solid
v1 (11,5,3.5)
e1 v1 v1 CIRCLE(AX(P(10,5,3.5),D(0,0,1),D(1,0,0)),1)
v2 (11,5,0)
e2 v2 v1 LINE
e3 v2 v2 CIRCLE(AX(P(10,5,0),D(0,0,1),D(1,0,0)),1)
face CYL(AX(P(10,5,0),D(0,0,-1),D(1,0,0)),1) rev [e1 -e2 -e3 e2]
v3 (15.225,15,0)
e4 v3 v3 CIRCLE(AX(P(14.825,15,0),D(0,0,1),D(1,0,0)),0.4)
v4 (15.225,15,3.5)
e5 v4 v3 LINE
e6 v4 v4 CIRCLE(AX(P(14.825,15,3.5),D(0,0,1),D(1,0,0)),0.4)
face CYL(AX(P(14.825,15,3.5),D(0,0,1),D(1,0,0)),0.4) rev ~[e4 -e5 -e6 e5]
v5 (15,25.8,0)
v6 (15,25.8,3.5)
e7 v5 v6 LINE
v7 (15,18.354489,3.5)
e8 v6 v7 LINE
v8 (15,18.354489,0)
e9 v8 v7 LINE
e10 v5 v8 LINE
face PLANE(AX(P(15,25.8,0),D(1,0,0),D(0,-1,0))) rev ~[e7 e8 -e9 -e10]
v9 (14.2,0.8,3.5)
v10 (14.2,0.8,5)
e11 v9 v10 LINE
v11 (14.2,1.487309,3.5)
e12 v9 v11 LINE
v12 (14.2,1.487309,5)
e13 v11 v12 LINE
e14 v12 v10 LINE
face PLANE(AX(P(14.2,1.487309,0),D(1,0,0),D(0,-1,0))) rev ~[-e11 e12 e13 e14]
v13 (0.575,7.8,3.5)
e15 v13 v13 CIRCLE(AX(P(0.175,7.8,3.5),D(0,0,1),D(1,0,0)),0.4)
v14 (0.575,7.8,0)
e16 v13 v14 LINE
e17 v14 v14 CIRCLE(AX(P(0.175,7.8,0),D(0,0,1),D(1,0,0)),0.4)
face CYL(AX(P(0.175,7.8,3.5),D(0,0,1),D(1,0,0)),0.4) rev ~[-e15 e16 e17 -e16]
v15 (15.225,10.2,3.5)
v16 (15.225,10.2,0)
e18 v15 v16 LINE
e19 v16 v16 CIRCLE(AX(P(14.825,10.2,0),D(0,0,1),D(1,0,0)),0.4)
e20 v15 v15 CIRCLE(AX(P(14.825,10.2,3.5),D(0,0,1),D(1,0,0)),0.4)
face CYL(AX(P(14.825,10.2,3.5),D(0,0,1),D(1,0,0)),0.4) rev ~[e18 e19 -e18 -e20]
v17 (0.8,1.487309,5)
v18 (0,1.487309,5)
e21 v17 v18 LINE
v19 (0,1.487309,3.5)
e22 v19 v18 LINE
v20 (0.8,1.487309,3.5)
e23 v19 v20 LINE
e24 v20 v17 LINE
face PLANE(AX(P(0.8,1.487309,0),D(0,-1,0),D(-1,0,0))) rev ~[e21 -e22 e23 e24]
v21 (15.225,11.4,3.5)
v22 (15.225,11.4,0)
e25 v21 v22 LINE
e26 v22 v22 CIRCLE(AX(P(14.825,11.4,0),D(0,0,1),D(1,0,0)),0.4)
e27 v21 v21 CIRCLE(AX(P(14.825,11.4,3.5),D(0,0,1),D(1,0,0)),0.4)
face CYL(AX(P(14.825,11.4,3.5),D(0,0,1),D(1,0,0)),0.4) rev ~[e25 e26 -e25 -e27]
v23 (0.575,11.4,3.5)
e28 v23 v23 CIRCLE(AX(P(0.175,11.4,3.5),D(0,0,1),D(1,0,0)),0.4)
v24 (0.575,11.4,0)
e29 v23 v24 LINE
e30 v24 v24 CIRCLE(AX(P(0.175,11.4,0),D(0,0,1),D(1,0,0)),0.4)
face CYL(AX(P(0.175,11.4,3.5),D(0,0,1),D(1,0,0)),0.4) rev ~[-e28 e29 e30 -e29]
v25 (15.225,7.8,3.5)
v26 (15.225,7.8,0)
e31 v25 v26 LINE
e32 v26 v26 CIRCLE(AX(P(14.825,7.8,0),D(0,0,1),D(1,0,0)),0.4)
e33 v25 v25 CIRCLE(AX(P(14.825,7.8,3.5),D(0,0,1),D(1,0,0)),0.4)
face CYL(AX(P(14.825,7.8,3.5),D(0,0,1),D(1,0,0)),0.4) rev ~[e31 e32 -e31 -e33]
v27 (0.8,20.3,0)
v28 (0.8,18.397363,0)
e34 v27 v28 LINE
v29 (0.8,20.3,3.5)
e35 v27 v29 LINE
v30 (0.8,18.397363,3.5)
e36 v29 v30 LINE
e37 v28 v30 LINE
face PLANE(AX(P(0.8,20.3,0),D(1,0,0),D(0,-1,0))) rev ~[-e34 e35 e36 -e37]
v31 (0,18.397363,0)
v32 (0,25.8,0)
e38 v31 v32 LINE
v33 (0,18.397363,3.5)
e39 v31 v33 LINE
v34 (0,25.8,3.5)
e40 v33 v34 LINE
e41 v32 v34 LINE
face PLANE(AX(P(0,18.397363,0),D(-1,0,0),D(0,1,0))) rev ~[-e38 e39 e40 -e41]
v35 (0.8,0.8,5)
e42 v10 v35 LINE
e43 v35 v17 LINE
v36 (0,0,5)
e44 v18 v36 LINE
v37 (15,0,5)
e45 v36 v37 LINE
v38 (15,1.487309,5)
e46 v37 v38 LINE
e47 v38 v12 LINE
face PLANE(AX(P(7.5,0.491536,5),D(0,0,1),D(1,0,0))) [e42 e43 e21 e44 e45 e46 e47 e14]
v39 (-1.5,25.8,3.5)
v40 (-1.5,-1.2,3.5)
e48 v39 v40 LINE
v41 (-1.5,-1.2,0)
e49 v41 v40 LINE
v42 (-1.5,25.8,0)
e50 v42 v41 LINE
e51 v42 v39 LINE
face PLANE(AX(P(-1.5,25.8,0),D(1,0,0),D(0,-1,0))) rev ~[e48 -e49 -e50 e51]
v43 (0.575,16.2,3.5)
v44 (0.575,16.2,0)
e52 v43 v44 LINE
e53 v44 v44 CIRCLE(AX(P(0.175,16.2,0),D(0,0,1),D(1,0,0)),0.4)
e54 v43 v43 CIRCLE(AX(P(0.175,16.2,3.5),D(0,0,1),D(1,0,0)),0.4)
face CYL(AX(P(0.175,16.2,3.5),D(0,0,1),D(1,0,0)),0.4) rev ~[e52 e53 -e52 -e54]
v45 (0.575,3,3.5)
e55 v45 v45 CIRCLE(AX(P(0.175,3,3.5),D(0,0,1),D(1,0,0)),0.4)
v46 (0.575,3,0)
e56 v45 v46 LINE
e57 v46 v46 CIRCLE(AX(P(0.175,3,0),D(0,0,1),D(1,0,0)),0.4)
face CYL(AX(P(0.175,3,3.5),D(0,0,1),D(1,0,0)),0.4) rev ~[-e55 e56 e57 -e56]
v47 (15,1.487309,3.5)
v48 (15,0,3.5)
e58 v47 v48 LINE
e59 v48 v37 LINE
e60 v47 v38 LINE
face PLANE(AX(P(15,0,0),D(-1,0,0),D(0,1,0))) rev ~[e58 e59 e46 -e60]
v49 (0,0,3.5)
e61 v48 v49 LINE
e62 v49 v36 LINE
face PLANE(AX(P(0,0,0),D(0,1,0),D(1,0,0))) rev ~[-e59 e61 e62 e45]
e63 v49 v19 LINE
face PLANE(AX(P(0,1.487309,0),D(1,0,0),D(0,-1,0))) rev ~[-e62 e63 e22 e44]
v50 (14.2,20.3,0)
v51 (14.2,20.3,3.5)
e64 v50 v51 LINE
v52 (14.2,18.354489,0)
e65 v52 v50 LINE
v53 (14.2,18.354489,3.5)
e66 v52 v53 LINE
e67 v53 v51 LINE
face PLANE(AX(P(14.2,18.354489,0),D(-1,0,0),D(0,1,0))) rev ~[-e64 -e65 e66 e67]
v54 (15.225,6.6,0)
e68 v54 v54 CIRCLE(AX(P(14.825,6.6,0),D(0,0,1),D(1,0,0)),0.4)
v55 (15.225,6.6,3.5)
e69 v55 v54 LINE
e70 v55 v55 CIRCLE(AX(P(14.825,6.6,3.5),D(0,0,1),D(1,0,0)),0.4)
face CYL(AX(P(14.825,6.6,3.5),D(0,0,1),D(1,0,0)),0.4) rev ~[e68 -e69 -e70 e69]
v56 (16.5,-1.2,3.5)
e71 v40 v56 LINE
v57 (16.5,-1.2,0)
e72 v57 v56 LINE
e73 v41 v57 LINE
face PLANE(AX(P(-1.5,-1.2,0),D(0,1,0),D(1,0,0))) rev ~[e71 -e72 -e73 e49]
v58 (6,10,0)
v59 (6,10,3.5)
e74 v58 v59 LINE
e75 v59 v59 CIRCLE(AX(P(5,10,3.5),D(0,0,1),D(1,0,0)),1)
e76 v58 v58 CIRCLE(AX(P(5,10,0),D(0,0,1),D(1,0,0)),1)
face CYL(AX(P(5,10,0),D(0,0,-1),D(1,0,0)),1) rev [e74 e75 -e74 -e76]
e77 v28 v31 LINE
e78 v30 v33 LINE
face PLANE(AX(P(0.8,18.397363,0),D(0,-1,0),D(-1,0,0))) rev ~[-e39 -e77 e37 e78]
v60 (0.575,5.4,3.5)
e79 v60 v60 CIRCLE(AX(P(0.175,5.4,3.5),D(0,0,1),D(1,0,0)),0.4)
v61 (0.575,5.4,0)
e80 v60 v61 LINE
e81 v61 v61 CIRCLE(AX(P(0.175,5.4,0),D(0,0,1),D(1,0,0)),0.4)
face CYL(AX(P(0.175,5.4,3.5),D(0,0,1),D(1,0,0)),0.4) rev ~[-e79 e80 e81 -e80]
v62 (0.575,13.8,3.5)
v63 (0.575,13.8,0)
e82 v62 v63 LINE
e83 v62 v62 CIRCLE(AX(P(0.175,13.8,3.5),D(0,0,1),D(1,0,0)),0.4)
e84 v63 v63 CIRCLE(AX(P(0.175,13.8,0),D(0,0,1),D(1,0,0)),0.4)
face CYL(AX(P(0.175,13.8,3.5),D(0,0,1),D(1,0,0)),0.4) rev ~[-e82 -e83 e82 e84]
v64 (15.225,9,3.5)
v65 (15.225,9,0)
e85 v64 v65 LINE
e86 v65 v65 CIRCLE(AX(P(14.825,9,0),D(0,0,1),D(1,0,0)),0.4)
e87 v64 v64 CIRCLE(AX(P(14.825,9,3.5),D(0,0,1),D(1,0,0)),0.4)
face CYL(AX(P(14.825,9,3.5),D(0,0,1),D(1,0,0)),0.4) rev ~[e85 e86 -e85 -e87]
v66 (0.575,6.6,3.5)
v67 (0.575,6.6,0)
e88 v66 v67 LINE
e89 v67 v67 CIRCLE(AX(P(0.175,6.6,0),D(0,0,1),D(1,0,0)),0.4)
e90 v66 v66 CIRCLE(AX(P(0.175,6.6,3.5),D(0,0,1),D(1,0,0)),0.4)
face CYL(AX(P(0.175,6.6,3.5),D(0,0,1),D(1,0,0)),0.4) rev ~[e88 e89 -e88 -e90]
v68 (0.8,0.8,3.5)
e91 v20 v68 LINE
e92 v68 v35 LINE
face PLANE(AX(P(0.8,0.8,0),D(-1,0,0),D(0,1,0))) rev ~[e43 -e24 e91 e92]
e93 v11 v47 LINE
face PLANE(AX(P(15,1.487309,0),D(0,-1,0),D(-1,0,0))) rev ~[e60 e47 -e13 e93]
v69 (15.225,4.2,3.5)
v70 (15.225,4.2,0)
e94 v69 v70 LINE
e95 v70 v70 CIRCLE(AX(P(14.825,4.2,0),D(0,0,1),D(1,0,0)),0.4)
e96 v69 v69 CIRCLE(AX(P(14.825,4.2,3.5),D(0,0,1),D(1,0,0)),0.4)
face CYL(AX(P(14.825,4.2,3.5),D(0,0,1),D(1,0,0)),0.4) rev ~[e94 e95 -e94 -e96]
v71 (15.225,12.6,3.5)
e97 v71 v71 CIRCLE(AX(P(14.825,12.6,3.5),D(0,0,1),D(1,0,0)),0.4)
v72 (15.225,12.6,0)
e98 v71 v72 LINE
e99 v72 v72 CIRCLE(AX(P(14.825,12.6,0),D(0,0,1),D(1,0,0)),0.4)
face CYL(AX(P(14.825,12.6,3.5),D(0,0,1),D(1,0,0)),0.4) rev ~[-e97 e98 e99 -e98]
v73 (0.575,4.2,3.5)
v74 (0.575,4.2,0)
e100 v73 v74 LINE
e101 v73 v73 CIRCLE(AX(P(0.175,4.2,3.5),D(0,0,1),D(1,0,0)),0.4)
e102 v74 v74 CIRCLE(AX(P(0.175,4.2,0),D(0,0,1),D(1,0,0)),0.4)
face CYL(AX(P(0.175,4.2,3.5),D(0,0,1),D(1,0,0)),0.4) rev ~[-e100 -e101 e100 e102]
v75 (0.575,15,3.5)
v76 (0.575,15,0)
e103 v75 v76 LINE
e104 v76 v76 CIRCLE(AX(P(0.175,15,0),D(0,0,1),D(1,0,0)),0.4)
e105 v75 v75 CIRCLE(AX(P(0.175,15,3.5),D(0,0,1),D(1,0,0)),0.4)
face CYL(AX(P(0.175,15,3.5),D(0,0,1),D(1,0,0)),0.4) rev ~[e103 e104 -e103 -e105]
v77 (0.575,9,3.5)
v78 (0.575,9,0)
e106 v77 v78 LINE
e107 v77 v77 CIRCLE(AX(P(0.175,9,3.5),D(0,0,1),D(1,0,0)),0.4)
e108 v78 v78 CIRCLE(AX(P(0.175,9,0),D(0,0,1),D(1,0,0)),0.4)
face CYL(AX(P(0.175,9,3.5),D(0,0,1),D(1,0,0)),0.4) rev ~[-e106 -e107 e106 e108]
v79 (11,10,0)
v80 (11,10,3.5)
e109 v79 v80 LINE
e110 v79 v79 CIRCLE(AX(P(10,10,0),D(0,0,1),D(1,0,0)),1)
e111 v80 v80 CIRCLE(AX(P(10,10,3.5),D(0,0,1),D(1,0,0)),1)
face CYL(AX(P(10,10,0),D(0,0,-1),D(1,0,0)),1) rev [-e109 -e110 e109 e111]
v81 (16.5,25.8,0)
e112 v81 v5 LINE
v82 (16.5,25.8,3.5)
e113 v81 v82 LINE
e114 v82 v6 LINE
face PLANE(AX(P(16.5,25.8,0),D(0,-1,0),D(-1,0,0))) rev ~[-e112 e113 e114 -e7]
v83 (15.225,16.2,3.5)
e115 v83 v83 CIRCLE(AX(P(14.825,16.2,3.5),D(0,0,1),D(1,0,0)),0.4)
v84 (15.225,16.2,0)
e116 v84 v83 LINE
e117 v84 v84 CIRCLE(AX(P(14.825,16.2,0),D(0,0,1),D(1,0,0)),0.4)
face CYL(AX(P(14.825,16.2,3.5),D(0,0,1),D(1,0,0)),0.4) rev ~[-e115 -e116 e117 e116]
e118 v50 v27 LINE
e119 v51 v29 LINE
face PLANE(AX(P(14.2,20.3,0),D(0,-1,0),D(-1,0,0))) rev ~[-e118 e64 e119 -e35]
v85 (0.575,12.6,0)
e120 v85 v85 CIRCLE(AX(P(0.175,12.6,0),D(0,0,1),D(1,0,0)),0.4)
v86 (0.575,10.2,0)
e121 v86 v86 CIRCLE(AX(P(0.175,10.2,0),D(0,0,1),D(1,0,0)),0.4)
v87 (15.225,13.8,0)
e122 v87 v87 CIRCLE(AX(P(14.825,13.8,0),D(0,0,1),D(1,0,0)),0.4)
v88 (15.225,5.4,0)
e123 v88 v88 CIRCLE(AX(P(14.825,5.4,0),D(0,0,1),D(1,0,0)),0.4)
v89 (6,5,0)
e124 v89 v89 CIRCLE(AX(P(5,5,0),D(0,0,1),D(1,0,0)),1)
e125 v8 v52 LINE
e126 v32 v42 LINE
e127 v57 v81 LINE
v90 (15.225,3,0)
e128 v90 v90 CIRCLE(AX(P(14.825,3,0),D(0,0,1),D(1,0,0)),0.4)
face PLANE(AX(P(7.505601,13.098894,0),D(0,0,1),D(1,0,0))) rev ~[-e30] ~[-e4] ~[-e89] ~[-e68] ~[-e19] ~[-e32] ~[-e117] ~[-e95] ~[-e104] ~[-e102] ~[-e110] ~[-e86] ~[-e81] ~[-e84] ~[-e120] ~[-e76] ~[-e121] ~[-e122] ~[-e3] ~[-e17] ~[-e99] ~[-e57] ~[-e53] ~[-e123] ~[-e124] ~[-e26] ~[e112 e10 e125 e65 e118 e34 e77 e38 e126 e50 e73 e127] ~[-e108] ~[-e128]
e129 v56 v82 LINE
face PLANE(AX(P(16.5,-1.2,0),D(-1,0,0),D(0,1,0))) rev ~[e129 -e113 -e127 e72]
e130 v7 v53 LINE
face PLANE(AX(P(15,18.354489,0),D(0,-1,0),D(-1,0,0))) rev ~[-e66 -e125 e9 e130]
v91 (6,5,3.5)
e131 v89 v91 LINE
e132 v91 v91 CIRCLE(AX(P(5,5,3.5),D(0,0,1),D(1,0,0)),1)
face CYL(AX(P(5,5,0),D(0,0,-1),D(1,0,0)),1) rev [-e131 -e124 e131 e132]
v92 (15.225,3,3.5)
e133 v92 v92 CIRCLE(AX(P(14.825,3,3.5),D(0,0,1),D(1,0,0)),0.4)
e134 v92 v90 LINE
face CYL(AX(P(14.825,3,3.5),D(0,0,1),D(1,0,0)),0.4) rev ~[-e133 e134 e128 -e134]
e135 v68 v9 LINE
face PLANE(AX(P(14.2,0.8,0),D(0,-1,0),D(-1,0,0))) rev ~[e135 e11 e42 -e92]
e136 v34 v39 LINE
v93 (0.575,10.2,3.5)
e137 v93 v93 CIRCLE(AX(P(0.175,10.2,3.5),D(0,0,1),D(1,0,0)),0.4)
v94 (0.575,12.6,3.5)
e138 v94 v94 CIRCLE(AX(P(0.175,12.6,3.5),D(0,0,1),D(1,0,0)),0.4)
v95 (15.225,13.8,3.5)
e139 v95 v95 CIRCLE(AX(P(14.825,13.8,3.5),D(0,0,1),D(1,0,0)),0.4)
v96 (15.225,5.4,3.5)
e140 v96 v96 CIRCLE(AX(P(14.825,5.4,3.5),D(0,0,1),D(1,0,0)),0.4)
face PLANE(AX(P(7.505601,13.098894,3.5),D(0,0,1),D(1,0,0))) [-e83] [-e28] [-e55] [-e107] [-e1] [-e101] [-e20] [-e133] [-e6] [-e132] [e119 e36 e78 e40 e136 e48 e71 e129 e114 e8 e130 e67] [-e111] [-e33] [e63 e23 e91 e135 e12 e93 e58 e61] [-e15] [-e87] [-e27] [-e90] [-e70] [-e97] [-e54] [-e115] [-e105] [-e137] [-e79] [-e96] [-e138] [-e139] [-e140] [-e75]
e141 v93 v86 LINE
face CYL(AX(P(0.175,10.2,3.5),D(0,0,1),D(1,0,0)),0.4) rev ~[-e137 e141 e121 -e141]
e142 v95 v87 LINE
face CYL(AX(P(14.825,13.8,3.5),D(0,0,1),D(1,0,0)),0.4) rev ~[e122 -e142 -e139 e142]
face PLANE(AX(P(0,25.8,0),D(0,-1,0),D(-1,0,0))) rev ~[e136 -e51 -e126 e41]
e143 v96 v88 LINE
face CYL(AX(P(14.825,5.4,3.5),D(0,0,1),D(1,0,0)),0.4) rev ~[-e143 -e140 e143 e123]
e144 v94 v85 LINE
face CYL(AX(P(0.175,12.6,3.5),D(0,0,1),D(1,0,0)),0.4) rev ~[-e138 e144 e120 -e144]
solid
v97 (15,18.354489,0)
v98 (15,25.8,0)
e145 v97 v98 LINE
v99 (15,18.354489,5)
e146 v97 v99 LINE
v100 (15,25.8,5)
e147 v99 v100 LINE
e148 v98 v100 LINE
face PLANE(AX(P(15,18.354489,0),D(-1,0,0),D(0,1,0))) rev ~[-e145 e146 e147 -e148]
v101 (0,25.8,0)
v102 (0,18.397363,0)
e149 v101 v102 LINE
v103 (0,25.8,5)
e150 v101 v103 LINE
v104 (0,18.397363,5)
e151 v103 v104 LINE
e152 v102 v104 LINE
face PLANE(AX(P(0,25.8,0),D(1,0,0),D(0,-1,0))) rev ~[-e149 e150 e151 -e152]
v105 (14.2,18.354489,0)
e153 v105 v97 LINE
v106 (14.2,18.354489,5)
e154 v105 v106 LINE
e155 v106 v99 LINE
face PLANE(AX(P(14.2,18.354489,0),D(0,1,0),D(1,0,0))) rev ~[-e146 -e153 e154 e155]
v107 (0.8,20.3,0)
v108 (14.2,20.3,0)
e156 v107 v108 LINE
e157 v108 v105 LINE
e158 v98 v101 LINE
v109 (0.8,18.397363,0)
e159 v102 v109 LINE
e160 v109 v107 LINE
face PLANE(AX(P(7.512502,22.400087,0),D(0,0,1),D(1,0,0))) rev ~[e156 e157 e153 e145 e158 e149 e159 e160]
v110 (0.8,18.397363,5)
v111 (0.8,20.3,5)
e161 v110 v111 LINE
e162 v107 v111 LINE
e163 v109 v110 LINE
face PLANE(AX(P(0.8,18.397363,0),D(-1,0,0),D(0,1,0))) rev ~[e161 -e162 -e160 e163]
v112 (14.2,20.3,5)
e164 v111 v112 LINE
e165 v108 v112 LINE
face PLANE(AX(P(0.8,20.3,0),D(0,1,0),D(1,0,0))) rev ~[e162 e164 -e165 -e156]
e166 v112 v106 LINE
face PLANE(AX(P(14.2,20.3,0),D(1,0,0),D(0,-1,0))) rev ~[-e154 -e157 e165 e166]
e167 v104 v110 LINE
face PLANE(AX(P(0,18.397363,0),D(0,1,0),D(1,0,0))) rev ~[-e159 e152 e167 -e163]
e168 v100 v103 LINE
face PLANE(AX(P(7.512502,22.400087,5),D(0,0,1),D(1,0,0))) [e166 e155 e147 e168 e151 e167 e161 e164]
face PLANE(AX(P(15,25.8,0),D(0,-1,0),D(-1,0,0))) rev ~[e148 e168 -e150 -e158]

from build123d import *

# Parameters (mm, degrees)
F1_DEPTH = 5
F0_R     = 1
F2_DEPTH = 3.5
F3_R     = 0.4
F4_DEPTH = 12.5


with BuildPart() as f1:
    # F0 (on Top) → F1 (new body)
    with BuildSketch(Plane.XY):
        Polygon((0, 1.4873089967), (0, 0), (15, 0), (15, 1.4873089967), (14.2, 1.4873089967), (14.2, 0.8), (0.8, 0.8), (0.8, 1.4873089967), align=None)
    extrude(amount=F1_DEPTH)

    # F0 (on Top) → F2 (join)
    with BuildSketch(Plane.XY):
        Polygon((0, 18.3973629028), (0, 25.8), (-1.5, 25.8), (-1.5, -1.2), (16.5, -1.2), (16.5, 25.8), (15, 25.8), (15, 18.3544885367), (14.2, 18.3544885367), (14.2, 20.3), (0.8, 20.3), (0.8, 18.3973629028), align=None)
        with Locations((5, 5)):
            Circle(F0_R, mode=Mode.SUBTRACT)
        with Locations((5, 10)):
            Circle(F0_R, mode=Mode.SUBTRACT)
        Polygon((15, 0), (0, 0), (0, 1.4873089967), (0.8, 1.4873089967), (0.8, 0.8), (14.2, 0.8), (14.2, 1.4873089967), (15, 1.4873089967), align=None, mode=Mode.SUBTRACT)
        with Locations((10, 5)):
            Circle(F0_R, mode=Mode.SUBTRACT)
        with Locations((10, 10)):
            Circle(F0_R, mode=Mode.SUBTRACT)
    extrude(amount=F2_DEPTH)

    # F3 (on face) → F4 (cut, symmetric)
    with BuildSketch(Plane.XY.offset(3.5)):
        with Locations((0.175, 3)):
            Circle(F3_R)
        with Locations((0.175, 4.2)):
            Circle(F3_R)
        with Locations((0.175, 5.4)):
            Circle(F3_R)
        with Locations((0.175, 6.6)):
            Circle(F3_R)
        with Locations((0.175, 7.8)):
            Circle(F3_R)
        with Locations((0.175, 9)):
            Circle(F3_R)
        with Locations((0.175, 10.2)):
            Circle(F3_R)
        with Locations((0.175, 11.4)):
            Circle(F3_R)
        with Locations((0.175, 12.6)):
            Circle(F3_R)
        with Locations((0.175, 13.8)):
            Circle(F3_R)
        with Locations((0.175, 15)):
            Circle(F3_R)
        with Locations((0.175, 16.2)):
            Circle(F3_R)
        with Locations((14.825, 3)):
            Circle(F3_R)
        with Locations((14.825, 4.2)):
            Circle(F3_R)
        with Locations((14.825, 5.4)):
            Circle(F3_R)
        with Locations((14.825, 6.6)):
            Circle(F3_R)
        with Locations((14.825, 7.8)):
            Circle(F3_R)
        with Locations((14.825, 9)):
            Circle(F3_R)
        with Locations((14.825, 10.2)):
            Circle(F3_R)
        with Locations((14.825, 11.4)):
            Circle(F3_R)
        with Locations((14.825, 12.6)):
            Circle(F3_R)
        with Locations((14.825, 13.8)):
            Circle(F3_R)
        with Locations((14.825, 15)):
            Circle(F3_R)
        with Locations((14.825, 16.2)):
            Circle(F3_R)
    extrude(amount=F4_DEPTH, both=True, mode=Mode.SUBTRACT)


with BuildPart() as f1b:
    # F0 (on Top) → F1, piece 2 (new body)
    with BuildSketch(Plane.XY):
        Polygon((15, 25.8), (0, 25.8), (0, 18.3973629028), (0.8, 18.3973629028), (0.8, 20.3), (14.2, 20.3), (14.2, 18.3544885367), (15, 18.3544885367), align=None)
    extrude(amount=F1_DEPTH)


solid = Compound([f1.part, f1b.part])
